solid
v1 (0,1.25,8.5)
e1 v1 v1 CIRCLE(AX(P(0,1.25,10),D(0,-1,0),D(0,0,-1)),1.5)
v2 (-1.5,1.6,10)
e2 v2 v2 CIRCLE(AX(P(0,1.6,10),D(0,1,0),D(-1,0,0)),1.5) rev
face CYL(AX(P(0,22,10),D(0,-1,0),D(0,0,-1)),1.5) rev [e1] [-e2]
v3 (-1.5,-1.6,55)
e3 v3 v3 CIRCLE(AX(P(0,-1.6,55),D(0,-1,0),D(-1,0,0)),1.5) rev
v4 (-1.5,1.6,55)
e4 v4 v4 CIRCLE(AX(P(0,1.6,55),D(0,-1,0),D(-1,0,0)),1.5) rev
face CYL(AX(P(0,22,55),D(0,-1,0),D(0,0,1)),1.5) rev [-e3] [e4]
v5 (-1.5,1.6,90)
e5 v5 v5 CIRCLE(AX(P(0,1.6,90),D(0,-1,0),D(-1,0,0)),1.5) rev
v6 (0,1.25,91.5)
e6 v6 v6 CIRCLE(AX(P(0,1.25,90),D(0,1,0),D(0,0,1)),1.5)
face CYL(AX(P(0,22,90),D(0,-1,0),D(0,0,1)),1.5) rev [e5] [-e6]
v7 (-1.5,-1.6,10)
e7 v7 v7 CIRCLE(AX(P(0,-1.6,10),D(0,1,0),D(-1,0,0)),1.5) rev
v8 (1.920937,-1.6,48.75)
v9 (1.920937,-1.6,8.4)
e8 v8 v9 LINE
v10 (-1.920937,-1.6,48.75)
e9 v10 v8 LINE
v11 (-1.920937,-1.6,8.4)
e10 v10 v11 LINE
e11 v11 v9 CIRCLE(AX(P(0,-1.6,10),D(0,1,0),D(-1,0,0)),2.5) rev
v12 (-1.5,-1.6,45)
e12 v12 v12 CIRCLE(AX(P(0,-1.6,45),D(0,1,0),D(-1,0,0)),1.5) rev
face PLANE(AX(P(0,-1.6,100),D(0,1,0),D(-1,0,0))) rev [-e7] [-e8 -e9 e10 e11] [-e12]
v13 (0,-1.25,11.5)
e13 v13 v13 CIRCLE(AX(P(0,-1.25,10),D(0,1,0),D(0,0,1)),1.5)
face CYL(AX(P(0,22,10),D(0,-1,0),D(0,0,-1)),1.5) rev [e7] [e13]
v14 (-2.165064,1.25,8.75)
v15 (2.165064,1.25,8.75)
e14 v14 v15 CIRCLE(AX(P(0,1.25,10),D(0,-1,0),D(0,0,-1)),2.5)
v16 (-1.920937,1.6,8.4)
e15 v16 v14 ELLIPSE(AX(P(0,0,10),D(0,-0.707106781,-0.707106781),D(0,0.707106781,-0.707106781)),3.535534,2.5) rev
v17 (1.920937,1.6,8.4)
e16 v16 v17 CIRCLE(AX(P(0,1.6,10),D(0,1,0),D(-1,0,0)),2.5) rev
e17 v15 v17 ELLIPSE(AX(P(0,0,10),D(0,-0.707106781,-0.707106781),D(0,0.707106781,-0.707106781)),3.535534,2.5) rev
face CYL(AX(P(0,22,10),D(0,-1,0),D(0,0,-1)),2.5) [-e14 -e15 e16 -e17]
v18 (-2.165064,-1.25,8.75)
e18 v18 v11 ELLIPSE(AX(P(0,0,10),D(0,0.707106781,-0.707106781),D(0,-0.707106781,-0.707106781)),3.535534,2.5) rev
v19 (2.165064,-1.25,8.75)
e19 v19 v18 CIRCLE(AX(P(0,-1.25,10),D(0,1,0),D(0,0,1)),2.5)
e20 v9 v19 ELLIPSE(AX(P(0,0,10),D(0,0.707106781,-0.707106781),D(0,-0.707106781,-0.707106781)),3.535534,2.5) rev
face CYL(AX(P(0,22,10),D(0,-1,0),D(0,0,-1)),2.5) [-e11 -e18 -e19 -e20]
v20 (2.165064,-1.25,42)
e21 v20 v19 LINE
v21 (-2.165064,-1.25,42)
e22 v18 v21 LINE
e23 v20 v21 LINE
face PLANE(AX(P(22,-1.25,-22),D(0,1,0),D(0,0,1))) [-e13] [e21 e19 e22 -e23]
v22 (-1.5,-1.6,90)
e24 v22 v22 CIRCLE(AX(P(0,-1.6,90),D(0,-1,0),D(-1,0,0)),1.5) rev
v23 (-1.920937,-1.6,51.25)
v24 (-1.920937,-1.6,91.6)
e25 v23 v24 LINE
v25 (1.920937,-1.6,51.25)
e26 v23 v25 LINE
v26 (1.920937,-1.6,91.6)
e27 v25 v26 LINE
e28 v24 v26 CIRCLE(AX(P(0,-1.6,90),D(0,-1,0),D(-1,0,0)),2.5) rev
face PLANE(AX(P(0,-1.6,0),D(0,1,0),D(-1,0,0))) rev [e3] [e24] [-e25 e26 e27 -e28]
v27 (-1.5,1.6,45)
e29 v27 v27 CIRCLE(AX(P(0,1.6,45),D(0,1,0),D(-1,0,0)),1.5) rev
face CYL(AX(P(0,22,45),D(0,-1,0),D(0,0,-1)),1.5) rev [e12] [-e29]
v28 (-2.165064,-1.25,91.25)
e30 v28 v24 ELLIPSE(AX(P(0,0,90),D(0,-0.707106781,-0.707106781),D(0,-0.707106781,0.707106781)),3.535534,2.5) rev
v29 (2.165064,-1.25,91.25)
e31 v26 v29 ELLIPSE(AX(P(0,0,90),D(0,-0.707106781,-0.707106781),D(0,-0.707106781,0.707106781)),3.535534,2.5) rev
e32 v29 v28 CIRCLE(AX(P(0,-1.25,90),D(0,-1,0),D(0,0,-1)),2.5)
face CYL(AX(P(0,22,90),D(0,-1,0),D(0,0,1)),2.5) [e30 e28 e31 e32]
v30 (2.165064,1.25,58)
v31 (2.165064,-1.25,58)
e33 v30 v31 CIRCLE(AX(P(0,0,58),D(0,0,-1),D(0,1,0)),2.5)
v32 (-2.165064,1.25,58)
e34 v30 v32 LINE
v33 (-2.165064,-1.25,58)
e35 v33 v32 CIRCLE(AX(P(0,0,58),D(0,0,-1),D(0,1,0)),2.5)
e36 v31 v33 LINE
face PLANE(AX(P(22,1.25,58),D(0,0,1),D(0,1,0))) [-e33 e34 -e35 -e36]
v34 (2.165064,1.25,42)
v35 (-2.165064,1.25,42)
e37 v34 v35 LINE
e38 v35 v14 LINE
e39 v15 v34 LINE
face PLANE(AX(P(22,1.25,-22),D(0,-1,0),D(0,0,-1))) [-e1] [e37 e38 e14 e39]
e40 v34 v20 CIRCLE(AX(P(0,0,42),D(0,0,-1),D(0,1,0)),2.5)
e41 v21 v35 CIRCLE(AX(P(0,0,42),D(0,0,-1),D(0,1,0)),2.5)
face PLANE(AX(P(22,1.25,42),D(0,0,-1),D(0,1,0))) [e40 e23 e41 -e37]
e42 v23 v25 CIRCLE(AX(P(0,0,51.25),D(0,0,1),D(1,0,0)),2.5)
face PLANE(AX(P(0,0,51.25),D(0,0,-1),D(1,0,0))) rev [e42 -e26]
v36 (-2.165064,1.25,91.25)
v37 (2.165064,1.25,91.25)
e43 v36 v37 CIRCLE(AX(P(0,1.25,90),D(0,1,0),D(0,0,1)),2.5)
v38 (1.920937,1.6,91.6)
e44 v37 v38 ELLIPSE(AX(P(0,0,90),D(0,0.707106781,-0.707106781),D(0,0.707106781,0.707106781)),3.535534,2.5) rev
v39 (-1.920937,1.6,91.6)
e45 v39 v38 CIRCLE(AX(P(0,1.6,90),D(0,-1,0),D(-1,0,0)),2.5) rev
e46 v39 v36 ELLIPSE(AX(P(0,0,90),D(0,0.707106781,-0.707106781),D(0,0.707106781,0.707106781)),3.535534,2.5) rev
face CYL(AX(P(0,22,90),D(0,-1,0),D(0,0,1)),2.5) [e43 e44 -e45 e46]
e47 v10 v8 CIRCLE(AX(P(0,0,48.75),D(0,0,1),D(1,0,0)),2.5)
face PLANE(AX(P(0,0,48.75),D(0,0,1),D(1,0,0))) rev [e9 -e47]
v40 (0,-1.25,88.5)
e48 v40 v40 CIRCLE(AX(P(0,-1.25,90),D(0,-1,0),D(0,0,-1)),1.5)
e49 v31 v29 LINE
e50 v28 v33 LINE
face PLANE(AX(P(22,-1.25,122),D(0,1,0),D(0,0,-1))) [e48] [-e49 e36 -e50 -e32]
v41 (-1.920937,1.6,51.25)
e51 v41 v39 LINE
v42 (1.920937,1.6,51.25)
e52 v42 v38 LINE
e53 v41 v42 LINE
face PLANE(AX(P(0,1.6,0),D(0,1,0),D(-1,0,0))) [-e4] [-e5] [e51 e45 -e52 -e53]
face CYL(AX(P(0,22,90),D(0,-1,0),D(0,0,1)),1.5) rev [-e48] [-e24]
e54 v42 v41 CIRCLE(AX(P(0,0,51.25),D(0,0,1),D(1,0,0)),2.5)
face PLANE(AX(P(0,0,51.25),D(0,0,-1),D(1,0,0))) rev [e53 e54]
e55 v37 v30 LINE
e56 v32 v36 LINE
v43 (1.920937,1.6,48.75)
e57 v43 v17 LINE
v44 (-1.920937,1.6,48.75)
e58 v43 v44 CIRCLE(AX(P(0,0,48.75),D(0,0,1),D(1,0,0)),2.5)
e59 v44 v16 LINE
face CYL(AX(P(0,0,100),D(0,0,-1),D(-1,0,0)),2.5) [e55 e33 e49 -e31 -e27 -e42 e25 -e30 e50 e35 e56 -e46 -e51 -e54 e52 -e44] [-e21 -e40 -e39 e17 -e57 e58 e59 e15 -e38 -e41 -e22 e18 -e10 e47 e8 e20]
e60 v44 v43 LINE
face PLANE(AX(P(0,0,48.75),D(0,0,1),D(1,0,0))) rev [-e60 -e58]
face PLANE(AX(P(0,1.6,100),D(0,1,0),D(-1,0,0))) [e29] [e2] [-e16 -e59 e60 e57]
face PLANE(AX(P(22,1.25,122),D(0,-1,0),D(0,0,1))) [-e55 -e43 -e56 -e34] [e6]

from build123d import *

# Parameters (mm, degrees)
EXTRUDE_1_DEPTH          = 100
CUT_EXTRUDE_START        = -1.6
CUT_EXTRUDE_2_OUTLINE_W  = 11.543856376
CUT_EXTRUDE_2_OUTLINE_H  = 103.894707388
CUT_EXTRUDE_2_OUTLINE_R  = 1.5
CUT_EXTRUDE_2_DEPTH      = 3.2
CUT_EXTRUDE_3_DEPTH      = 22
CUT_EXTRUDE_3_DEPTH_BACK = 22
SKETCH_6_W               = 64
SKETCH_6_H               = 2.5
EXTRUDE_START            = -1.25
SKETCH_7_R               = 2.5
EXTRUDE_2_DEPTH          = 1.25


# Read off the part's stored shape, not the designer's step: 切除-拉伸2
with BuildPart() as part:
    # 草图1 → 凸台-拉伸1 (new body)
    with BuildSketch(Plane.XY):
        with BuildLine():
            Line((1.920937271, 1.6), (0, 1.6))
            Line((0, 1.6), (0, -1.6))
            Line((0, -1.6), (1.920937271, -1.6))
            ThreePointArc((1.920937271, -1.6), (2.350781059, -0.850781059), (2.5, 0))
            ThreePointArc((2.5, 0), (2.350781059, 0.850781059), (1.920937271, 1.6))
        make_face()
        with BuildLine():
            Line((0, -1.6), (0, 1.6))
            Line((0, 1.6), (-1.920937271, 1.6))
            ThreePointArc((-1.920937271, 1.6), (-2.5, 0), (-1.920937271, -1.6))
            Line((-1.920937271, -1.6), (0, -1.6))
        make_face()
    extrude(amount=EXTRUDE_1_DEPTH)

    # 切除-拉伸2 outline → 切除-拉伸2 (cut)
    # profile 1 of 3: a face of its own
    with BuildSketch(Plane(origin=(0, 0, 0), x_dir=(1, 0, 0), z_dir=(0, 1, 0)).offset(CUT_EXTRUDE_START)):
        with Locations((0.333099219, -49.873134062)):
            Rectangle(CUT_EXTRUDE_2_OUTLINE_W, CUT_EXTRUDE_2_OUTLINE_H)
        with BuildLine():
            Line((-2.5, -50), (-2.5, -10))
            ThreePointArc((-2.5, -10), (0, -7.5), (2.5, -10))
            Line((2.5, -10), (2.5, -50))
            Line((2.5, -50), (-2.5, -50))
        make_face(mode=Mode.SUBTRACT)
    # profile 2 of 3: a face of its own
    with BuildSketch(Plane(origin=(0, 0, 0), x_dir=(1, 0, 0), z_dir=(0, 1, 0)).offset(CUT_EXTRUDE_START)):
        with Locations((0, -45)):
            Circle(CUT_EXTRUDE_2_OUTLINE_R)
    # profile 3 of 3: a face of its own
    with BuildSketch(Plane(origin=(0, 0, 0), x_dir=(1, 0, 0), z_dir=(0, 1, 0)).offset(CUT_EXTRUDE_START)):
        with Locations((0, -10)):
            Circle(CUT_EXTRUDE_2_OUTLINE_R)
    extrude(amount=CUT_EXTRUDE_2_DEPTH, mode=Mode.SUBTRACT)

    # 草图6 → 切除-拉伸3 (cut, two sides: drawn at the far end of the back side and taken through both)
    with BuildSketch(Plane(origin=(0, 0, 0), x_dir=(0, 0, -1), z_dir=(1, 0, 0)).offset(-CUT_EXTRUDE_3_DEPTH_BACK)):
        with Locations((-10, 0)):
            Rectangle(SKETCH_6_W, SKETCH_6_H)
    extrude(amount=CUT_EXTRUDE_3_DEPTH + CUT_EXTRUDE_3_DEPTH_BACK, mode=Mode.SUBTRACT)

    # 草图7 → 凸台-拉伸2 (add)
    with BuildSketch(Plane.XY.offset(50).offset(EXTRUDE_START)):
        with Locations(Location((0, 0, 0), (0, 0, 150))):
            Circle(SKETCH_7_R)
    extrude(amount=EXTRUDE_2_DEPTH)

    # 镜向1: part across face


with BuildPart() as part_1:
    add(part.part)
    add(part.part.mirror(Plane.XY.offset(50)))


solid = part_1.part
